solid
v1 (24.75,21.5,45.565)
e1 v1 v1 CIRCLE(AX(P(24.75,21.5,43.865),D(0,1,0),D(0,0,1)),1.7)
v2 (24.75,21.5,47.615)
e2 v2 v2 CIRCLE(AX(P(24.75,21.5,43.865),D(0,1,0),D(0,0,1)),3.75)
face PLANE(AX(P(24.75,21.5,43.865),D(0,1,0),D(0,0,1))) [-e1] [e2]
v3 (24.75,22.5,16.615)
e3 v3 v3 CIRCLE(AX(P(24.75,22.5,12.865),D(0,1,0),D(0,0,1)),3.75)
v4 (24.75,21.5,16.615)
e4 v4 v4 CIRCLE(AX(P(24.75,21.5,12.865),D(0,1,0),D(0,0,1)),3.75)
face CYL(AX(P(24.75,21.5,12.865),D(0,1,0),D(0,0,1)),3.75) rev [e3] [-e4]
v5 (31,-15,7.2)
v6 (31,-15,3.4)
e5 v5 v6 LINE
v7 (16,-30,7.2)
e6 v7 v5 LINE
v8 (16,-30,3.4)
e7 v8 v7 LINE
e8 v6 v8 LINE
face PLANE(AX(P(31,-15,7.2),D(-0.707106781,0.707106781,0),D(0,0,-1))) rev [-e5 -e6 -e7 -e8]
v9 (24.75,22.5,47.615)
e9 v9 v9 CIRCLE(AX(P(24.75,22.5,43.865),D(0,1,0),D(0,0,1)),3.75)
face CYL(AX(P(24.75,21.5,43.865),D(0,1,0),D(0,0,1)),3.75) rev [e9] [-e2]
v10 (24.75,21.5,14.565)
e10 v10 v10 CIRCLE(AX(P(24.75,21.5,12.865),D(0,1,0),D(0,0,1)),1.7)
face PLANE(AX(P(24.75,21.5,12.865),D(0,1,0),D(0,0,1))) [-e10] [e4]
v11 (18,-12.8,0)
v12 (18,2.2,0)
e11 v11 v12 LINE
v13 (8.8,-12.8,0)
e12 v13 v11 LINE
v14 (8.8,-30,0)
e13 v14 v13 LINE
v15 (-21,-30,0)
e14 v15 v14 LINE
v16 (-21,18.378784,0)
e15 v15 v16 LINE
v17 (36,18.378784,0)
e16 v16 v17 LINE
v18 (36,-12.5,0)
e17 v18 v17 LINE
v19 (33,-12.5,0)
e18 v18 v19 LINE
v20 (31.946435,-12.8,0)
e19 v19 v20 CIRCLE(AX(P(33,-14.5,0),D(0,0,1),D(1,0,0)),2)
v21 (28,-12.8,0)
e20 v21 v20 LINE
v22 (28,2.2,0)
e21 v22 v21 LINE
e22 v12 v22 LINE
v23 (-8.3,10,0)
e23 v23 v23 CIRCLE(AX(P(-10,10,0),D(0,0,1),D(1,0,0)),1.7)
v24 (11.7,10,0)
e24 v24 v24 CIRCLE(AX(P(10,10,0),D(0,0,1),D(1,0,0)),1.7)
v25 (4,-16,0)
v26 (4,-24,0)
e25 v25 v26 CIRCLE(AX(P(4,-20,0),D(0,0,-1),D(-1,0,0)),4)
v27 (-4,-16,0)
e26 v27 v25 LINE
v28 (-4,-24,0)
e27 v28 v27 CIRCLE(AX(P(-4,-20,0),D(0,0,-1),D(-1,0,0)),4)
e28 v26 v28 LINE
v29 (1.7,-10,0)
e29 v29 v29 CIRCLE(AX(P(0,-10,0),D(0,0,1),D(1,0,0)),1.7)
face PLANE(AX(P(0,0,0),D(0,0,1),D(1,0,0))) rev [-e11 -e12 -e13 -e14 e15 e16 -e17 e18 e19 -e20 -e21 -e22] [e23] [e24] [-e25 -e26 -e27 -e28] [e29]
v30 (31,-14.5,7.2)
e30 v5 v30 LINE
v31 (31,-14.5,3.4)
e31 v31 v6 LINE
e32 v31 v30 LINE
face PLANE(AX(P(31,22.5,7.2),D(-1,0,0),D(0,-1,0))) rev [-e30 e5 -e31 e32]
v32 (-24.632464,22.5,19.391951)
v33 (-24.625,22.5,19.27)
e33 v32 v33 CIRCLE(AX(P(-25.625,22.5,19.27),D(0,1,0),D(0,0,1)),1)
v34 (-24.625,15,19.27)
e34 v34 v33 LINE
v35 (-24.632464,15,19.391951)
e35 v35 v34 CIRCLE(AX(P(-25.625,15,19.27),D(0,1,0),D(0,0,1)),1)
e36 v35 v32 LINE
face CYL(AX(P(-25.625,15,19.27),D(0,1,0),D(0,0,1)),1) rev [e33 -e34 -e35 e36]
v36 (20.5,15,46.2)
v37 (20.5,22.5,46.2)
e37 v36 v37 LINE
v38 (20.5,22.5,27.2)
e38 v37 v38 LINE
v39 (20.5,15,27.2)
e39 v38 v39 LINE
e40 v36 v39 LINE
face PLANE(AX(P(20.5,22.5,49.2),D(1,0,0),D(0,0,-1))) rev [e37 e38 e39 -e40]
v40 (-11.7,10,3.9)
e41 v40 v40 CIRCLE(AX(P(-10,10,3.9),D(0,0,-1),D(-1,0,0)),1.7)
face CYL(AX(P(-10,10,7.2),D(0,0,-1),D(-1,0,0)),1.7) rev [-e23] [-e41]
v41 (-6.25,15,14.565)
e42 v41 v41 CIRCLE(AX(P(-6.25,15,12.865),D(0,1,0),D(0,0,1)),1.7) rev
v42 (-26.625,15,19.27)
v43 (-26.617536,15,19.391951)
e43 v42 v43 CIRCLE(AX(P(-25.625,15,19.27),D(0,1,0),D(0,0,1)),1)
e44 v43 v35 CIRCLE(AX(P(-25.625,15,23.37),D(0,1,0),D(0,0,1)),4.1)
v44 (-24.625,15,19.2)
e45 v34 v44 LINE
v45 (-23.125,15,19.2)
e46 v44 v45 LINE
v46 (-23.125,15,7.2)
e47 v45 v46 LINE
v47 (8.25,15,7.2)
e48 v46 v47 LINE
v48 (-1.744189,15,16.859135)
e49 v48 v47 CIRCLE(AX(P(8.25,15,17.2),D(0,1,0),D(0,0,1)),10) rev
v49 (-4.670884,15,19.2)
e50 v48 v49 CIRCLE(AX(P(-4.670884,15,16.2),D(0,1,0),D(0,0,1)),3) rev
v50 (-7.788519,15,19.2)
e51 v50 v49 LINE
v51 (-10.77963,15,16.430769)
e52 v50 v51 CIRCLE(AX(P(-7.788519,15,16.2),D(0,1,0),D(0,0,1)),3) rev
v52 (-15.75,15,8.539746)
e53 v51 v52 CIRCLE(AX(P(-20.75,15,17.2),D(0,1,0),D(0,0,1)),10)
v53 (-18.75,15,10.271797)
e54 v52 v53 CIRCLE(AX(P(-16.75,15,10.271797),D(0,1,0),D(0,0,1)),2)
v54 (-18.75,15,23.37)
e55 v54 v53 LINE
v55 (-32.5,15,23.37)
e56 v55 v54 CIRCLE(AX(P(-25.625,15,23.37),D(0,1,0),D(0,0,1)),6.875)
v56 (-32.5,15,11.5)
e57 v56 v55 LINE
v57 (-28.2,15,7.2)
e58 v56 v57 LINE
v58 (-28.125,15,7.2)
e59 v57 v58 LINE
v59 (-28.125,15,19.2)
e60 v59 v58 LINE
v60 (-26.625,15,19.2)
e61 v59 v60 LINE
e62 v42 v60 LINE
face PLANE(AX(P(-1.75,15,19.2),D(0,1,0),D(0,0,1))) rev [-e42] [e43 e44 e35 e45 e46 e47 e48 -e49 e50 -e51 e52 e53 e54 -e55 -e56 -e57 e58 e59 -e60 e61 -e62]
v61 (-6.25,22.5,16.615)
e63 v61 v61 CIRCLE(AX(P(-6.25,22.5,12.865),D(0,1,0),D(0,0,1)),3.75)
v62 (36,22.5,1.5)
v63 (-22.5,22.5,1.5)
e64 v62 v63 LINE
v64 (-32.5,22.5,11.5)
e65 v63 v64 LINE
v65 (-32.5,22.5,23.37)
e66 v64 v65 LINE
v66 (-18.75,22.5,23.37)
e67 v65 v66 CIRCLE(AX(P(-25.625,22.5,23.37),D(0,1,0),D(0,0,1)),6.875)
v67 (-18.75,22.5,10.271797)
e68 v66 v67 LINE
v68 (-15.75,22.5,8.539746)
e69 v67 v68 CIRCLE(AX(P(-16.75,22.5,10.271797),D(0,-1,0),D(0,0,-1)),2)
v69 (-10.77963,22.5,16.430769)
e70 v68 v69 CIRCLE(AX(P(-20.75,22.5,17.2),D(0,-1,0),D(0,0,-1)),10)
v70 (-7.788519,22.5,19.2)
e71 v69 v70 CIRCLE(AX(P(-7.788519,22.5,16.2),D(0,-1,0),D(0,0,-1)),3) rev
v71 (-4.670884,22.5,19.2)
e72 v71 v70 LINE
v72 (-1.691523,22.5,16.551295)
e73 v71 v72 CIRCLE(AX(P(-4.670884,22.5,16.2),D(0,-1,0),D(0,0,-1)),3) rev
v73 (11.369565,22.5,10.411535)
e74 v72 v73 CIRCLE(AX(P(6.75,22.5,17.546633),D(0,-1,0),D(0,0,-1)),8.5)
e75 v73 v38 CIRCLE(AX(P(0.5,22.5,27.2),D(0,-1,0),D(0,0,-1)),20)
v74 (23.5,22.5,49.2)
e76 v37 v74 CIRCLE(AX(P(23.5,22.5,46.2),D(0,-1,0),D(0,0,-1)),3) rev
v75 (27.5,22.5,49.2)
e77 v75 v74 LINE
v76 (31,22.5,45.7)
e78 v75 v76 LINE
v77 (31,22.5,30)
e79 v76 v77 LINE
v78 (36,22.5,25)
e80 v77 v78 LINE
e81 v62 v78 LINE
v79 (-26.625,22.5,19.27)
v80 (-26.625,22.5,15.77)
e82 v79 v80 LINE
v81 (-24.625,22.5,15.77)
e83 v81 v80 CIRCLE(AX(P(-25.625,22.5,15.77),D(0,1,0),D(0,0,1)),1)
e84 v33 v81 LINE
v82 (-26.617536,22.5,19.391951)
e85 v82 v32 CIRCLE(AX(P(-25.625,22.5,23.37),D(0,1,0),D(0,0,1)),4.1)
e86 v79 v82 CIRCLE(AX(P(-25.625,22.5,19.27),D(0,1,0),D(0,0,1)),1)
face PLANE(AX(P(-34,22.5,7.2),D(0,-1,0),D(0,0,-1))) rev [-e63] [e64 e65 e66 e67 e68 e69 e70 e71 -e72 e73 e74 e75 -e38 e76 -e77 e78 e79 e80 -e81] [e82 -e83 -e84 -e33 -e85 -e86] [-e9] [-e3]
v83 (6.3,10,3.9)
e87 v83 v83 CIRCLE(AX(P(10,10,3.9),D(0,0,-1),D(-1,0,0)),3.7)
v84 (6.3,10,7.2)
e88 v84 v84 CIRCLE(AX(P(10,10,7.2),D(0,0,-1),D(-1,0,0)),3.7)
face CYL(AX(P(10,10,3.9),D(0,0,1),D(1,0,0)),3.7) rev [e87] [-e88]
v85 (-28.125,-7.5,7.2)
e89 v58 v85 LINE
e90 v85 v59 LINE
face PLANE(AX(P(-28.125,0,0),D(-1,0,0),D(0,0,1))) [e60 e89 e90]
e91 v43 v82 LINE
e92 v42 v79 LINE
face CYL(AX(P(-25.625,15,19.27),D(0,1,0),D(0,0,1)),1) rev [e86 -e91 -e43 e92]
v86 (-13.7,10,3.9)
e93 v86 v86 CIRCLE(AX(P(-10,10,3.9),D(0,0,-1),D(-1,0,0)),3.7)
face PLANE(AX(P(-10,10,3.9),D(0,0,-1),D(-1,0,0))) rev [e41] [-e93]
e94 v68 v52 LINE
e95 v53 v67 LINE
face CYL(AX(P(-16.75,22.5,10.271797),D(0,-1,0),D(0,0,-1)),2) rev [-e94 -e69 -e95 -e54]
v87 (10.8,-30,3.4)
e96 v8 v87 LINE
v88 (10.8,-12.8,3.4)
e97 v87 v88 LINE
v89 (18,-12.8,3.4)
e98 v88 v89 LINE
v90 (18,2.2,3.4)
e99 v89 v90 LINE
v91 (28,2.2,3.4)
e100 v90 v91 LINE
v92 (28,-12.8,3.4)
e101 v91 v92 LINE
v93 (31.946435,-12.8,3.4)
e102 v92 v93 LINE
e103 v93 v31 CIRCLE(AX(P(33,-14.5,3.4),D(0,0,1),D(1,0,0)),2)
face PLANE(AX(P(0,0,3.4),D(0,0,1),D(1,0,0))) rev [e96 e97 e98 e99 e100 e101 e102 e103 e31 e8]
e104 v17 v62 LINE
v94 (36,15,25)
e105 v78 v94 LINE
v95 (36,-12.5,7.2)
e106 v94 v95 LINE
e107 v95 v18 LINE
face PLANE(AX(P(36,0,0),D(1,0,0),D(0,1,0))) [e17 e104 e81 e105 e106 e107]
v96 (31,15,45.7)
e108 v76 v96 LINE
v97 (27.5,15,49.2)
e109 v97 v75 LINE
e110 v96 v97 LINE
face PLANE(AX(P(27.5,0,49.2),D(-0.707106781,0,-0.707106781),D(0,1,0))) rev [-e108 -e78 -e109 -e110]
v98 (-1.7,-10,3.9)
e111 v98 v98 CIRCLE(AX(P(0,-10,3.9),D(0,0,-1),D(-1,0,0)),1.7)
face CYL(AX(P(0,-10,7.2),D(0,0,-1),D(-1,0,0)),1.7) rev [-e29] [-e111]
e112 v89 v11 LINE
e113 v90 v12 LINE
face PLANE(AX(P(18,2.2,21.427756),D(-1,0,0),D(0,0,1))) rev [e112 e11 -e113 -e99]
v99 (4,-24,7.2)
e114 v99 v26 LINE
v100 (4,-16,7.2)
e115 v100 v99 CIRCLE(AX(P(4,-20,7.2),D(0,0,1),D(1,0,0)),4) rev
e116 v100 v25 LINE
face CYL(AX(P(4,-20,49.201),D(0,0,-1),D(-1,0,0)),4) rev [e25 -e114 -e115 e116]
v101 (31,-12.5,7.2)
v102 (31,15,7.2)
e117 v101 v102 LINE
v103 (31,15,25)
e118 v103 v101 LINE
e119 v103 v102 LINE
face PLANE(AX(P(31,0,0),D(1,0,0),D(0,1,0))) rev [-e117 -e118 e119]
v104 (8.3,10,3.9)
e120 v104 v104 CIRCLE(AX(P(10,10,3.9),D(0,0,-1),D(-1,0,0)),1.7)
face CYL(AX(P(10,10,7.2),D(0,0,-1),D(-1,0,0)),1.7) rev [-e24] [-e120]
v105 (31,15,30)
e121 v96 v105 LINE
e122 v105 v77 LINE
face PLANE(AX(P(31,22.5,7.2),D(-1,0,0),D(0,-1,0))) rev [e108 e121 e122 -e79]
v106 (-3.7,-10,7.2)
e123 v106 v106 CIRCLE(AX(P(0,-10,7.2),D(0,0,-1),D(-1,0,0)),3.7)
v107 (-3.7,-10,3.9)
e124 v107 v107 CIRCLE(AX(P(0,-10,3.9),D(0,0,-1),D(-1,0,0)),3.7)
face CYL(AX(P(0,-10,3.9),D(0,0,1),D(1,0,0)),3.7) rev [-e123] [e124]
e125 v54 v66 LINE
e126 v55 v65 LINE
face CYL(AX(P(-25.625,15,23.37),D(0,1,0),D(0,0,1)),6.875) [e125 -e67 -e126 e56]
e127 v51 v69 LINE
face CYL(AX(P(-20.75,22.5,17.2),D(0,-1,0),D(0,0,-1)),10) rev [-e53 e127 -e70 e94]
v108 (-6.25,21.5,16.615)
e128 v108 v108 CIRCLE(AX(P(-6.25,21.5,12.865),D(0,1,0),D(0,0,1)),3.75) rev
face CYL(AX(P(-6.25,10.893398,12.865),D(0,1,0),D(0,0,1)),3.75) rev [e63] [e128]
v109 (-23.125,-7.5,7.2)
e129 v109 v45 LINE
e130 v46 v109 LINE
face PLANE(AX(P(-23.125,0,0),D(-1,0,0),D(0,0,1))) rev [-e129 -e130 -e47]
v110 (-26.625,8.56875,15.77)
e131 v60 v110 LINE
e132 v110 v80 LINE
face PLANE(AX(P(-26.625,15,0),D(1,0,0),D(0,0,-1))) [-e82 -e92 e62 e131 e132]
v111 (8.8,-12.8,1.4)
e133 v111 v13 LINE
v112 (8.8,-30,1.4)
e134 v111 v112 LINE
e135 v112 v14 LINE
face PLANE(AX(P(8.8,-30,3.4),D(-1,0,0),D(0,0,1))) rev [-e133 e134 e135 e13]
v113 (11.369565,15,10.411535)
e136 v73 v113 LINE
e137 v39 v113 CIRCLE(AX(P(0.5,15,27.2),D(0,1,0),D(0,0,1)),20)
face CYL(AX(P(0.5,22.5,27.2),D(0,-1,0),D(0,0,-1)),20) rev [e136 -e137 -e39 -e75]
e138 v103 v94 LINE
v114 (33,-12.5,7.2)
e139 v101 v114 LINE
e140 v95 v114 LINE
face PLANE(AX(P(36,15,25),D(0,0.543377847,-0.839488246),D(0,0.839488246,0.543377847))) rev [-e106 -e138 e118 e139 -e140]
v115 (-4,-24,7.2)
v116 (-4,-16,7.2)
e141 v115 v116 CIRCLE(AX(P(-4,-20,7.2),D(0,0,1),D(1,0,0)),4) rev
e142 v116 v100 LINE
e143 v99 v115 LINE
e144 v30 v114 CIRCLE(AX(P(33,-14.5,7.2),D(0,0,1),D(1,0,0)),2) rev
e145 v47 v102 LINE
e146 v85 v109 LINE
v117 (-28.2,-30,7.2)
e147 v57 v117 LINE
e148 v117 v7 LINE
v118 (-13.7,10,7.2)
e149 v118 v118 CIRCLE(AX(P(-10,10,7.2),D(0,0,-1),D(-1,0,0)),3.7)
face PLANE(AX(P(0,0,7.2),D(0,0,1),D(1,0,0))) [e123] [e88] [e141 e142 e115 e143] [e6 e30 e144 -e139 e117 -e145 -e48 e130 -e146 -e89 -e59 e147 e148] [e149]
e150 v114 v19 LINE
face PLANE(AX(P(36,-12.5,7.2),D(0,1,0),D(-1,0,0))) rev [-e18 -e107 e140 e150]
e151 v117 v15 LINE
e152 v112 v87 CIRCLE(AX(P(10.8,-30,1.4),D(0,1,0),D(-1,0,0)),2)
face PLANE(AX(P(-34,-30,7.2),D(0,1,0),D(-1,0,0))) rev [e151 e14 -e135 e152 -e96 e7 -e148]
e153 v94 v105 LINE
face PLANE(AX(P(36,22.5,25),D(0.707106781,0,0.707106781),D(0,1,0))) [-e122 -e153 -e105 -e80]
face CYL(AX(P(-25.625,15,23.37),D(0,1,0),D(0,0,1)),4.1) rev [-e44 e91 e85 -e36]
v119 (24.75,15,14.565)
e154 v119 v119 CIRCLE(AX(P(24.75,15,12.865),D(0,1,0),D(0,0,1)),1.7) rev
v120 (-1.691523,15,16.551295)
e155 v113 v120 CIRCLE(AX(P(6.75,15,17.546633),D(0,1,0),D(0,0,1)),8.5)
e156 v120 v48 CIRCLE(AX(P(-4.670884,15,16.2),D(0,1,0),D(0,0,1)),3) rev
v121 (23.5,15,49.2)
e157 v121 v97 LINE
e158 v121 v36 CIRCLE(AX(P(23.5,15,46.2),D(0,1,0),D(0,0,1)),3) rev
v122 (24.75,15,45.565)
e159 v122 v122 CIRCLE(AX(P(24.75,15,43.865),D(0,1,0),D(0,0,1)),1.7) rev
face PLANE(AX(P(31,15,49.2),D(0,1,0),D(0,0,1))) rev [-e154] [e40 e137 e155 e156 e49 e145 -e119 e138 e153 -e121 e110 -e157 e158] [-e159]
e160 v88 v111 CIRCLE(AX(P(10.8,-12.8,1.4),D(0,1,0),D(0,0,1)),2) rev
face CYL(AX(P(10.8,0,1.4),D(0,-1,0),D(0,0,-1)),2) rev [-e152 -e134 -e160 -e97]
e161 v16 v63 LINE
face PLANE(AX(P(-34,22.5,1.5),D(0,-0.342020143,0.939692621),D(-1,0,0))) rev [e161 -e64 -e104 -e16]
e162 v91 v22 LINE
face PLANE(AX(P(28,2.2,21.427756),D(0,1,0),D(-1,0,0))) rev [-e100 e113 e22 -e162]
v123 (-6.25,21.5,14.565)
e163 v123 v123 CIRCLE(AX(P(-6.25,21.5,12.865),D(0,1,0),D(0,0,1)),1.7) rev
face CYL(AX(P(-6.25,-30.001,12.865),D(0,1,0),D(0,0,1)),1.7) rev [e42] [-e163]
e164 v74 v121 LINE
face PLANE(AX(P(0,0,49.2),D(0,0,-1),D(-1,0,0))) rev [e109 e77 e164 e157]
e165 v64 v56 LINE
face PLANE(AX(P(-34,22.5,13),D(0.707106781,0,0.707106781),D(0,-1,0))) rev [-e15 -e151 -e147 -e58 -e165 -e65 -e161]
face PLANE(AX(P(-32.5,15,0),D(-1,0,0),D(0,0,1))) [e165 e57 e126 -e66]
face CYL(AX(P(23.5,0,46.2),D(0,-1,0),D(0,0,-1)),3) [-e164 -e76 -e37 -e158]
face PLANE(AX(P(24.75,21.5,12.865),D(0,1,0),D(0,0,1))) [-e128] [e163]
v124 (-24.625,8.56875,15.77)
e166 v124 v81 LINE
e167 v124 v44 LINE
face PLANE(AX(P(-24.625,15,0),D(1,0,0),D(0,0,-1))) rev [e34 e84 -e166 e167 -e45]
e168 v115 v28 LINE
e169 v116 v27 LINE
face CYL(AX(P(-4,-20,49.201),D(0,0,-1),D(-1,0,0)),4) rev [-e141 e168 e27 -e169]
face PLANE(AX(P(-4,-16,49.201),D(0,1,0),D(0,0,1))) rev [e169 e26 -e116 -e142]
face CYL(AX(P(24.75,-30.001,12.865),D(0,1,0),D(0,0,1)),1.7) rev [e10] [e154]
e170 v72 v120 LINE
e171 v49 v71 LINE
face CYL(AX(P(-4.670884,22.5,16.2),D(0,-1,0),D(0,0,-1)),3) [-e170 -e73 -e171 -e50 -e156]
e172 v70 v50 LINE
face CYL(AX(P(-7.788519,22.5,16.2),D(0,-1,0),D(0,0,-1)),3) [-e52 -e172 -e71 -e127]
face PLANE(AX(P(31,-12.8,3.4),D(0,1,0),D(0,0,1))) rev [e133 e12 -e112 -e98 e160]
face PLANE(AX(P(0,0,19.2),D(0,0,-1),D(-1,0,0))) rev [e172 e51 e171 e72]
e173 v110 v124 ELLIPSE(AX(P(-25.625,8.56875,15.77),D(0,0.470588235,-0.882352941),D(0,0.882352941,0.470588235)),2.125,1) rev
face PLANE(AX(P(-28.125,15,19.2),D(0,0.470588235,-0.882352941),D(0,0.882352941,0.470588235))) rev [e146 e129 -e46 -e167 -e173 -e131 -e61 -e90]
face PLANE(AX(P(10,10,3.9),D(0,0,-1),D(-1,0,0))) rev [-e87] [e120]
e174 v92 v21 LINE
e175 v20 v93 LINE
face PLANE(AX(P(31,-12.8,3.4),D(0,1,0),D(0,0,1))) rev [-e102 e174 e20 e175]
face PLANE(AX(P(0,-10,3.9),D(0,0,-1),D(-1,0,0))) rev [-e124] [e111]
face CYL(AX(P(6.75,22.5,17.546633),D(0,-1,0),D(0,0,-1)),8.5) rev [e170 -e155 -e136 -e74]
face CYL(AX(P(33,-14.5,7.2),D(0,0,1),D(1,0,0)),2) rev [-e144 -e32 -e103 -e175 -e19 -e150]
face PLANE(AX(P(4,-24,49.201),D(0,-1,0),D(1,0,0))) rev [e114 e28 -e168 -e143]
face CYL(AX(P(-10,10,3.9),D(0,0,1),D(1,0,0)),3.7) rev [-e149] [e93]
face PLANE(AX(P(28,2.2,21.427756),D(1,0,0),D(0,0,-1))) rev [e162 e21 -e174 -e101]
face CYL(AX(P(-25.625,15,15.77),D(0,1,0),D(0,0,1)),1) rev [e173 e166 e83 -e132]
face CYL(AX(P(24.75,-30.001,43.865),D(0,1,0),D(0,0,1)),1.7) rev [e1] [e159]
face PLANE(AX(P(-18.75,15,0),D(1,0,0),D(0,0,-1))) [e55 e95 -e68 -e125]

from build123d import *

# Parameters (mm, degrees)
SZKIC1_W                    = 65
SZKIC1_H                    = 52.5
SZKIC1_R                    = 1.7
DODANIE_WYCI_GNI_CIE1_DEPTH = 7.2
SZKIC2_W                    = 22.2
SZKIC2_H                    = 17.2
WYTNIJ_WYCI_GNI_CIE1_DEPTH  = 3.4
ZAOKR_GLENIE1_R             = 2
SZKIC3_R                    = 3.7
WYTNIJ_WYCI_GNI_CIE2_DEPTH  = 3.3
SZKIC4_W                    = 10.5
SZKIC4_H                    = 7.5
DODANIE_WYCI_GNI_CIE2_DEPTH = 42
SZKIC5_R                    = 3.75
WYTNIJ_WYCI_GNI_CIE3_DEPTH  = 1
WYTNIJ_WYCI_GNI_CIE4_REACH  = 80.923
SZKIC6_R                    = 1.7
ZAOKR_GLENIE2_R             = 20
SFAZOWANIE1_SIZE            = 3.5
SZKIC7_W                    = 9
SZKIC7_H                    = 7.5
DODANIE_WYCI_GNI_CIE3_DEPTH = 12
WYTNIJ_WYCI_GNI_CIE5_REACH  = 81.579
SZKIC8_R                    = 1.7
SZKIC9_R                    = 3.75
WYTNIJ_WYCI_GNI_CIE6_DEPTH  = 1
ZAOKR_GLENIE3_R             = 10
ZAOKR_GLENIE4_R             = 8.5
DODANIE_WYCI_GNI_CIE4_DEPTH = 5
SFAZOWANIE2_SIZE            = 5
ZAOKR_GLENIE5_R             = 3
SFAZOWANIE3_SIZE            = 15
SFAZOWANIE4_SIZE            = 5
SFAZOWANIE5_SIZE            = 1.5
SFAZOWANIE5_SIZE2           = 4.121216129
ZAOKR_GLENIE6_R             = 2
DODANIE_WYCI_GNI_CIE5_DEPTH = 7.5
DODANIE_WYCI_GNI_CIE6_DEPTH = 2.5
WYTNIJ_WYCI_GNI_CIE7_REACH  = 77.774
ZAOKR_GLENIE7_R             = 2
WYTNIJ_WYCI_GNI_CIE8_REACH  = 69.946
SFAZOWANIE6_SIZE            = 13
SZKIC15_W                   = 10
SZKIC15_H                   = 15
WYTNIJ_WYCI_GNI_CIE9_DEPTH  = 3.4


with BuildPart() as part:
    # Szkic1 → Dodanie-wyciągnięcie1 (new body)
    with BuildSketch(Plane.XY):
        with Locations((-1.5, -3.75)):
            Rectangle(SZKIC1_W, SZKIC1_H)
        with Locations((10, 10)):
            Circle(SZKIC1_R, mode=Mode.SUBTRACT)
        with Locations((-10, 10)):
            Circle(SZKIC1_R, mode=Mode.SUBTRACT)
        with Locations((0, -10)):
            Circle(SZKIC1_R, mode=Mode.SUBTRACT)
    extrude(amount=DODANIE_WYCI_GNI_CIE1_DEPTH)

    # Szkic2 → Wytnij-wyciągnięcie1 (cut)
    with BuildSketch(Plane(origin=(0, 0, 0), x_dir=(-1, 0, 0), z_dir=(0, 0, -1))):
        with Locations((-19.9, -21.4)):
            Rectangle(SZKIC2_W, SZKIC2_H)
    extrude(amount=-WYTNIJ_WYCI_GNI_CIE1_DEPTH, mode=Mode.SUBTRACT)

    # Zaokrąglenie1
    zaokr_glenie1_edges = [part.edges().sort_by_distance(p)[0] for p in [
        (8.8, -21.4, 3.4),
    ]]
    fillet(zaokr_glenie1_edges, radius=ZAOKR_GLENIE1_R)

    # Szkic3 → Wytnij-wyciągnięcie2 (cut)
    with BuildSketch(Plane(origin=(0, 0, 7.2), x_dir=(-1, 0, 0), z_dir=(0, 0, -1))):
        with Locations((-10, 10)):
            Circle(SZKIC3_R)
        with Locations((10, 10)):
            Circle(SZKIC3_R)
        with Locations((0, -10)):
            Circle(SZKIC3_R)
    extrude(amount=WYTNIJ_WYCI_GNI_CIE2_DEPTH, mode=Mode.SUBTRACT)

    # Szkic4 → Dodanie-wyciągnięcie2 (add)
    with BuildSketch(Plane.XY.offset(7.2)):
        with Locations((25.75, 18.75)):
            Rectangle(SZKIC4_W, SZKIC4_H)
    extrude(amount=DODANIE_WYCI_GNI_CIE2_DEPTH)

    # Szkic5 → Wytnij-wyciągnięcie3 (cut)
    with BuildSketch(Plane(origin=(0, 22.5, 0), x_dir=(1, 0, 0), z_dir=(0, 1, 0))):
        with Locations(Location((24.75, -12.865, 0), (0, 0, 270))):
            Circle(SZKIC5_R)
        with Locations(Location((24.75, -43.865, 0), (0, 0, 270))):
            Circle(SZKIC5_R)
    extrude(amount=-WYTNIJ_WYCI_GNI_CIE3_DEPTH, mode=Mode.SUBTRACT)

    # Szkic6 → Wytnij-wyciągnięcie4 (cut, up to next)
    with BuildSketch(Plane(origin=(0, 21.5, 0), x_dir=(1, 0, 0), z_dir=(0, 1, 0)), mode=Mode.PRIVATE) as wytnij_wyci_gni_cie4_sk1:
        with Locations(Location((24.75, -43.865, 0), (0, 0, 270))):
            Circle(SZKIC6_R)
    wytnij_wyci_gni_cie4_tool1 = extrude(wytnij_wyci_gni_cie4_sk1.sketch, amount=-WYTNIJ_WYCI_GNI_CIE4_REACH, mode=Mode.PRIVATE) & part.part
    # Szkic6 → Wytnij-wyciągnięcie4 (cut, up to next)
    with BuildSketch(Plane(origin=(0, 21.5, 0), x_dir=(1, 0, 0), z_dir=(0, 1, 0)), mode=Mode.PRIVATE) as wytnij_wyci_gni_cie4_sk2:
        with Locations(Location((24.75, -12.865, 0), (0, 0, 270))):
            Circle(SZKIC6_R)
    wytnij_wyci_gni_cie4_tool2 = extrude(wytnij_wyci_gni_cie4_sk2.sketch, amount=-WYTNIJ_WYCI_GNI_CIE4_REACH, mode=Mode.PRIVATE) & part.part
    add(wytnij_wyci_gni_cie4_tool1.solids().sort_by_distance((24.75, 21.5, 43.865))[0], mode=Mode.SUBTRACT)
    add(wytnij_wyci_gni_cie4_tool2.solids().sort_by_distance((24.75, 21.5, 12.865))[0], mode=Mode.SUBTRACT)

    # Zaokrąglenie2
    zaokr_glenie2_edges = [part.edges().sort_by_distance(p)[0] for p in [
        (20.5, 18.75, 7.2),
    ]]
    fillet(zaokr_glenie2_edges, radius=ZAOKR_GLENIE2_R)

    # Sfazowanie1
    sfazowanie1_edges = [part.edges().sort_by_distance(p)[0] for p in [
        (31, 18.75, 49.2),
    ]]
    chamfer(sfazowanie1_edges, length=SFAZOWANIE1_SIZE)

    # Szkic7 → Dodanie-wyciągnięcie3 (add)
    with BuildSketch(Plane.XY.offset(7.2)):
        with Locations((-6.25, 18.75)):
            Rectangle(SZKIC7_W, SZKIC7_H)
    extrude(amount=DODANIE_WYCI_GNI_CIE3_DEPTH)

    # Szkic8 → Wytnij-wyciągnięcie5 (cut, up to next)
    with BuildSketch(Plane(origin=(0, 22.5, 0), x_dir=(1, 0, 0), z_dir=(0, 1, 0)), mode=Mode.PRIVATE) as wytnij_wyci_gni_cie5_sk1:
        with Locations(Location((-6.25, -12.865, 0), (0, 0, 270))):
            Circle(SZKIC8_R)
    wytnij_wyci_gni_cie5_tool1 = extrude(wytnij_wyci_gni_cie5_sk1.sketch, amount=-WYTNIJ_WYCI_GNI_CIE5_REACH, mode=Mode.PRIVATE) & part.part
    add(wytnij_wyci_gni_cie5_tool1.solids().sort_by_distance((-6.25, 22.5, 12.865))[0], mode=Mode.SUBTRACT)

    # Szkic9 → Wytnij-wyciągnięcie6 (cut)
    with BuildSketch(Plane(origin=(0, 22.5, 0), x_dir=(1, 0, 0), z_dir=(0, 1, 0))):
        with Locations(Location((-6.25, -12.865, 0), (0, 0, 270))):
            Circle(SZKIC9_R)
    extrude(amount=-WYTNIJ_WYCI_GNI_CIE6_DEPTH, mode=Mode.SUBTRACT)

    # Zaokrąglenie3
    # the kernel refuses this fillet: 10 mm, written as the material it adds along each edge
    with BuildSketch(Plane(origin=(-1.75, 15, 7.2), x_dir=(1, 0, 0), z_dir=(0, 1, 0)), Plane(origin=(-10.75, 22.5, 7.2), x_dir=(-1, 0, 0), z_dir=(0, -1, 0))) as zaokr_glenie3_piece_1:
        with BuildLine():
            CenterArc((ZAOKR_GLENIE3_R, -ZAOKR_GLENIE3_R), ZAOKR_GLENIE3_R, 90, 90)
            Line((0, -ZAOKR_GLENIE3_R), (-ZAOKR_GLENIE3_R * 0.02, -ZAOKR_GLENIE3_R))
            Line((-ZAOKR_GLENIE3_R * 0.02, -ZAOKR_GLENIE3_R), (-ZAOKR_GLENIE3_R * 0.02, ZAOKR_GLENIE3_R * 0.02))
            Line((-ZAOKR_GLENIE3_R * 0.02, ZAOKR_GLENIE3_R * 0.02), (ZAOKR_GLENIE3_R, ZAOKR_GLENIE3_R * 0.02))
            Line((ZAOKR_GLENIE3_R, ZAOKR_GLENIE3_R * 0.02), (ZAOKR_GLENIE3_R, 0))
        make_face()
    extrude(amount=7.5)

    # Zaokrąglenie4
    zaokr_glenie4_edges = [part.edges().sort_by_distance(p)[0] for p in [
        (5.052426327, 18.75, 7.725005403),
    ]]
    fillet(zaokr_glenie4_edges, radius=ZAOKR_GLENIE4_R)

    # Szkic10 → Dodanie-wyciągnięcie4 (add)
    with BuildSketch(Plane(origin=(31, 0, 0), x_dir=(0, 0, -1), z_dir=(1, 0, 0))):
        Polygon((0, 22.5), (-25, 22.5), (-25, 15), (-7.2, -12.5), (0, -12.5), align=None)
    extrude(amount=DODANIE_WYCI_GNI_CIE4_DEPTH)

    # Sfazowanie2
    # the kernel refuses this chamfer: 5 mm, written as the material it adds along each edge
    with BuildSketch(Plane(origin=(31, 22.5, 25), x_dir=(0.9996219169112968, 0, -0.027495876610586317), z_dir=(0, -1, 0))) as sfazowanie2_piece_1_section:
        Polygon((SFAZOWANIE2_SIZE * 0.999621916911, SFAZOWANIE2_SIZE * 0.0274958766106), (-SFAZOWANIE2_SIZE * 0.0274958766106, SFAZOWANIE2_SIZE * 0.999621916911), (0, 0), align=None)
    sfazowanie2_piece_1 = extrude(amount=7.5, mode=Mode.PRIVATE)
    sfazowanie2_piece_1 = split(sfazowanie2_piece_1, bisect_by=Plane(origin=(32.903625778, 18.804901793, 27.46280916), z_dir=(0, 0.5433778467080003, -0.8394882463185397)), keep=Keep.TOP, mode=Mode.PRIVATE)
    sfazowanie2_piece_1 = split(sfazowanie2_piece_1, bisect_by=Plane(origin=(36, 19.648805529, 26.159025298), z_dir=(-1, 0, 0)), keep=Keep.TOP, mode=Mode.PRIVATE)
    add(sfazowanie2_piece_1)
    with BuildSketch(Plane(origin=(31, 22.5, 25), x_dir=(0.9996219169112968, 0, -0.027495876610586317), z_dir=(0, -1, 0))) as sfazowanie2_piece_2_section:
        Polygon((SFAZOWANIE2_SIZE * 0.999621916911, SFAZOWANIE2_SIZE * 0.0274958766106), (-SFAZOWANIE2_SIZE * 0.0274958766106, SFAZOWANIE2_SIZE * 0.999621916911), (0, 0), align=None)
    sfazowanie2_piece_2 = extrude(amount=7.5, mode=Mode.PRIVATE)
    sfazowanie2_piece_2 = split(sfazowanie2_piece_2, bisect_by=Plane(origin=(32.139386126, 17.606139304, 26.686882895), z_dir=(0, -0.5433778467080003, 0.8394882463185397)), keep=Keep.TOP, mode=Mode.PRIVATE)
    add(sfazowanie2_piece_2)

    # Zaokrąglenie5
    zaokr_glenie5_edges = [part.edges().sort_by_distance(p)[0] for p in [
        (-1.75, 18.75, 19.2),
        (-10.75, 18.75, 19.2),
        (20.5, 18.75, 49.2),
    ]]
    fillet(zaokr_glenie5_edges, radius=ZAOKR_GLENIE5_R)

    # Sfazowanie3
    sfazowanie3_edges = [part.edges().sort_by_distance(p)[0] for p in [
        (31, -30, 5.3),
    ]]
    chamfer(sfazowanie3_edges, length=SFAZOWANIE3_SIZE)

    # Sfazowanie4
    sfazowanie4_edges = [part.edges().sort_by_distance(p)[0] for p in [
        (-34, -30, 3.6),
    ]]
    chamfer(sfazowanie4_edges, length=SFAZOWANIE4_SIZE)

    # Sfazowanie5
    sfazowanie5_edges = [part.edges().sort_by_distance(p)[0] for p in [
        (1, 22.5, 0),
    ]]
    sfazowanie5_side = [part.faces().sort_by_distance(p)[0] for p in [
        (25.5, 22.5, 48.344392611),
    ]]
    chamfer(sfazowanie5_edges, length=SFAZOWANIE5_SIZE, length2=SFAZOWANIE5_SIZE2, reference=sfazowanie5_side[0])

    # Zaokrąglenie6
    # the kernel refuses this fillet: 2 mm, written as the material it adds along each edge
    with BuildSketch(Plane(origin=(31, -12.5, 7.2), x_dir=(1, 0, 0), z_dir=(0, 0, -1))) as zaokr_glenie6_piece_1_section:
        with BuildLine():
            CenterArc((ZAOKR_GLENIE6_R, ZAOKR_GLENIE6_R), ZAOKR_GLENIE6_R, 180, 90)
            Line((0, ZAOKR_GLENIE6_R), (0, 0))
            Line((0, 0), (ZAOKR_GLENIE6_R, 0))
        make_face()
    zaokr_glenie6_piece_1 = extrude(amount=7.2, mode=Mode.PRIVATE)
    zaokr_glenie6_piece_1 = split(zaokr_glenie6_piece_1, bisect_by=Plane(origin=(31.565607048, -12.662060856, 7.095102428), z_dir=(0, -0.5433778467077901, 0.8394882463186757)), keep=Keep.TOP, mode=Mode.PRIVATE)
    zaokr_glenie6_piece_1 = split(zaokr_glenie6_piece_1, bisect_by=Plane(origin=(31.565607048, -12.8, 7.138467133), z_dir=(0, 1, 0)), keep=Keep.TOP, mode=Mode.PRIVATE)
    add(zaokr_glenie6_piece_1)
    with BuildSketch(Plane(origin=(31, -12.5, 7.2), x_dir=(1, 0, 0), z_dir=(0, 0, -1))) as zaokr_glenie6_piece_2_section:
        with BuildLine():
            CenterArc((ZAOKR_GLENIE6_R, ZAOKR_GLENIE6_R), ZAOKR_GLENIE6_R, 180, 90)
            Line((0, ZAOKR_GLENIE6_R), (0, 0))
            Line((0, 0), (ZAOKR_GLENIE6_R, 0))
        make_face()
    zaokr_glenie6_piece_2 = extrude(amount=7.2, mode=Mode.PRIVATE)
    zaokr_glenie6_piece_2 = split(zaokr_glenie6_piece_2, bisect_by=Plane(origin=(31.166986877, -13.307674451, 6.677214355), z_dir=(0, -0.5433778467077901, 0.8394882463186757)), keep=Keep.TOP, mode=Mode.PRIVATE)
    zaokr_glenie6_piece_2 = split(zaokr_glenie6_piece_2, bisect_by=Plane(origin=(31.166986877, -12.8, 6.893334183), z_dir=(0, -1, 0)), keep=Keep.TOP, mode=Mode.PRIVATE)
    add(zaokr_glenie6_piece_2)
    with BuildSketch(Plane(origin=(31, -12.5, 7.2), x_dir=(1, 0, 0), z_dir=(0, 0, -1))) as zaokr_glenie6_piece_3_section:
        with BuildLine():
            CenterArc((ZAOKR_GLENIE6_R, ZAOKR_GLENIE6_R), ZAOKR_GLENIE6_R, 180, 90)
            Line((0, ZAOKR_GLENIE6_R), (0, 0))
            Line((0, 0), (ZAOKR_GLENIE6_R, 0))
        make_face()
    zaokr_glenie6_piece_3 = extrude(amount=7.2, mode=Mode.PRIVATE)
    zaokr_glenie6_piece_3 = split(zaokr_glenie6_piece_3, bisect_by=Plane(origin=(31.705553294, -13.457947623, 6.57994663), z_dir=(0, 0.5433778467077901, -0.8394882463186757)), keep=Keep.TOP, mode=Mode.PRIVATE)
    zaokr_glenie6_piece_3 = split(zaokr_glenie6_piece_3, bisect_by=Plane(origin=(31.705553294, -12.606447573, 3.4), z_dir=(0, 0, 1)), keep=Keep.TOP, mode=Mode.PRIVATE)
    zaokr_glenie6_piece_3 = split(zaokr_glenie6_piece_3, bisect_by=Plane(origin=(31.705553294, -12.8, 5.26442689), z_dir=(0, 1, 0)), keep=Keep.TOP, mode=Mode.PRIVATE)
    add(zaokr_glenie6_piece_3)
    with BuildSketch(Plane(origin=(31, -12.5, 7.2), x_dir=(1, 0, 0), z_dir=(0, 0, -1))) as zaokr_glenie6_piece_4_section:
        with BuildLine():
            CenterArc((ZAOKR_GLENIE6_R, ZAOKR_GLENIE6_R), ZAOKR_GLENIE6_R, 180, 90)
            Line((0, ZAOKR_GLENIE6_R), (0, 0))
            Line((0, 0), (ZAOKR_GLENIE6_R, 0))
        make_face()
    zaokr_glenie6_piece_4 = extrude(amount=7.2, mode=Mode.PRIVATE)
    zaokr_glenie6_piece_4 = split(zaokr_glenie6_piece_4, bisect_by=Plane(origin=(31.240391442, -13.989449718, 6.235919819), z_dir=(0, 0.5433778467077901, -0.8394882463186757)), keep=Keep.TOP, mode=Mode.PRIVATE)
    zaokr_glenie6_piece_4 = split(zaokr_glenie6_piece_4, bisect_by=Plane(origin=(31.240391442, -13.230606229, 3.4), z_dir=(0, 0, 1)), keep=Keep.TOP, mode=Mode.PRIVATE)
    zaokr_glenie6_piece_4 = split(zaokr_glenie6_piece_4, bisect_by=Plane(origin=(31.240391442, -12.8, 5.063549258), z_dir=(0, -1, 0)), keep=Keep.TOP, mode=Mode.PRIVATE)
    add(zaokr_glenie6_piece_4)
    with BuildSketch(Plane(origin=(31, -12.5, 7.2), x_dir=(1, 0, 0), z_dir=(0, 0, -1))) as zaokr_glenie6_piece_5_section:
        with BuildLine():
            CenterArc((ZAOKR_GLENIE6_R, ZAOKR_GLENIE6_R), ZAOKR_GLENIE6_R, 180, 90)
            Line((0, ZAOKR_GLENIE6_R), (0, 0))
            Line((0, 0), (ZAOKR_GLENIE6_R, 0))
        make_face()
    zaokr_glenie6_piece_5 = extrude(amount=7.2, mode=Mode.PRIVATE)
    zaokr_glenie6_piece_5 = split(zaokr_glenie6_piece_5, bisect_by=Plane(origin=(31.702896829, -12.60803603, 3.4), z_dir=(0, 0, -1)), keep=Keep.TOP, mode=Mode.PRIVATE)
    zaokr_glenie6_piece_5 = split(zaokr_glenie6_piece_5, bisect_by=Plane(origin=(31.702896829, -12.8, 1.7), z_dir=(0, 1, 0)), keep=Keep.TOP, mode=Mode.PRIVATE)
    add(zaokr_glenie6_piece_5)

    # Szkic11 → Dodanie-wyciągnięcie5 (add)
    with BuildSketch(Plane(origin=(0, 22.5, 0), x_dir=(1, 0, 0), z_dir=(0, 1, 0))):
        with BuildLine():
            Line((-20.75, -7.2), (-32.5, -7.2))
            Line((-32.5, -7.2), (-32.5, -23.37))
            ThreePointArc((-32.5, -23.37), (-25.625, -30.245), (-18.75, -23.37))
            Line((-18.75, -23.37), (-18.75, -7.402041029))
            ThreePointArc((-18.75, -7.402041029), (-19.74491038, -7.25063847), (-20.75, -7.2))
        make_face()
        with BuildLine():
            ThreePointArc((-26.617536095, -19.39195122), (-26.62313228, -19.331089708), (-26.625, -19.27))
            Line((-26.625, -19.27), (-26.625, -15.77))
            ThreePointArc((-26.625, -15.77), (-25.625, -14.77), (-24.625, -15.77))
            Line((-24.625, -15.77), (-24.625, -19.27))
            ThreePointArc((-24.625, -19.27), (-24.62686772, -19.331089708), (-24.632463905, -19.39195122))
            ThreePointArc((-24.632463905, -19.39195122), (-22.393947695, -20.846054477), (-21.525, -23.37))
            ThreePointArc((-21.525, -23.37), (-28.148945523, -26.601052305), (-26.617536095, -19.39195122))
        make_face(mode=Mode.SUBTRACT)
    extrude(amount=-DODANIE_WYCI_GNI_CIE5_DEPTH)

    # Szkic12 → Dodanie-wyciągnięcie6 (add, symmetric)
    with BuildSketch(Plane.ZY.offset(25.625)):
        Polygon((19.2, 15), (7.2, -7.5), (7.2, 15), align=None)
    extrude(amount=DODANIE_WYCI_GNI_CIE6_DEPTH, both=True)

    # Szkic13 → Wytnij-wyciągnięcie7 (cut, up to next)
    with BuildSketch(Plane(origin=(0, 15, 0), x_dir=(1, 0, 0), z_dir=(0, 1, 0)), mode=Mode.PRIVATE) as wytnij_wyci_gni_cie7_sk1:
        with BuildLine():
            Line((-26.625, -15.77), (-26.625, -19.2))
            Line((-26.625, -19.2), (-24.625, -19.2))
            Line((-24.625, -19.2), (-24.625, -15.77))
            ThreePointArc((-24.625, -15.77), (-25.625, -14.77), (-26.625, -15.77))
        make_face()
    wytnij_wyci_gni_cie7_tool1 = extrude(wytnij_wyci_gni_cie7_sk1.sketch, amount=-WYTNIJ_WYCI_GNI_CIE7_REACH, mode=Mode.PRIVATE) & part.part
    add(wytnij_wyci_gni_cie7_tool1.solids().sort_by_distance((-25.625, 15, 17.086392))[0], mode=Mode.SUBTRACT)

    # Zaokrąglenie7
    # the kernel refuses this fillet: 2 mm, written as the material it adds along each edge
    with BuildSketch(Plane(origin=(-32.5, 22.5, 7.2), x_dir=(0, 0, 1), z_dir=(0, -1, 0))) as zaokr_glenie7_piece_1:
        with BuildLine():
            CenterArc((1.936491673, 2), ZAOKR_GLENIE7_R, 194.477512186, 75.522487814)
            Line((0, 1.5), (-0.038729833, 1.49))
            ThreePointArc((-0.038729833, 1.49), (-0.04, 0.75), (-0.04, 0))
            Line((-0.04, 0), (0, -0.04))
            Line((0, -0.04), (1.936491673, -0.04))
            Line((1.936491673, -0.04), (1.936491673, 0))
        make_face()
    extrude(amount=7.5)
    with BuildSketch(Plane(origin=(-18.75, 22.5, 7.402041029), x_dir=(0, 0, 1), z_dir=(0, -1, 0))) as zaokr_glenie7_piece_2:
        with BuildLine():
            CenterArc((2.869755741, -2), ZAOKR_GLENIE7_R, 90, 120)
            Line((1.137704933, -3), (1.103063917, -3.02))
            ThreePointArc((1.103063917, -3.02), (0.410349214, -1.560109977), (-0.039191836, -0.008))
            Line((-0.039191836, -0.008), (0, 0.04))
            Line((0, 0.04), (2.869755741, 0.04))
            Line((2.869755741, 0.04), (2.869755741, 0))
        make_face()
    extrude(amount=7.5)

    # Szkic14 → Wytnij-wyciągnięcie8 (cut, up to next)
    with BuildSketch(Plane(origin=(0, 0, 0), x_dir=(-1, 0, 0), z_dir=(0, 0, -1)), mode=Mode.PRIVATE) as wytnij_wyci_gni_cie8_sk1:
        with BuildLine():
            Line((-4, -24), (4, -24))
            ThreePointArc((4, -24), (8, -20), (4, -16))
            Line((4, -16), (-4, -16))
            ThreePointArc((-4, -16), (-8, -20), (-4, -24))
        make_face()
    wytnij_wyci_gni_cie8_tool1 = extrude(wytnij_wyci_gni_cie8_sk1.sketch, amount=-WYTNIJ_WYCI_GNI_CIE8_REACH, mode=Mode.PRIVATE) & part.part
    add(wytnij_wyci_gni_cie8_tool1.solids().sort_by_distance((0, -20, 0))[0], mode=Mode.SUBTRACT)

    # Sfazowanie6
    # the kernel refuses this chamfer: 13 mm, written as the material it takes off along each edge
    with BuildSketch(Plane(origin=(-34, -58.431878844, 0), x_dir=(-0.027495876610586424, 0, 0.9996219169112968), z_dir=(0, 1, 0))) as sfazowanie6_piece_1:
        Polygon((SFAZOWANIE6_SIZE * 0.999621916911, SFAZOWANIE6_SIZE * 0.0274958766106), (-SFAZOWANIE6_SIZE * 0.0274958766106, SFAZOWANIE6_SIZE * 0.999621916911), (0, 0), align=None)
    extrude(amount=110.242541558, mode=Mode.SUBTRACT)

    # Szkic15 → Wytnij-wyciągnięcie9 (cut)
    with BuildSketch(Plane(origin=(0, 0, 0), x_dir=(-1, 0, 0), z_dir=(0, 0, -1))):
        with Locations((-23, -5.3)):
            Rectangle(SZKIC15_W, SZKIC15_H)
    extrude(amount=-WYTNIJ_WYCI_GNI_CIE9_DEPTH, mode=Mode.SUBTRACT)


solid = part.part
